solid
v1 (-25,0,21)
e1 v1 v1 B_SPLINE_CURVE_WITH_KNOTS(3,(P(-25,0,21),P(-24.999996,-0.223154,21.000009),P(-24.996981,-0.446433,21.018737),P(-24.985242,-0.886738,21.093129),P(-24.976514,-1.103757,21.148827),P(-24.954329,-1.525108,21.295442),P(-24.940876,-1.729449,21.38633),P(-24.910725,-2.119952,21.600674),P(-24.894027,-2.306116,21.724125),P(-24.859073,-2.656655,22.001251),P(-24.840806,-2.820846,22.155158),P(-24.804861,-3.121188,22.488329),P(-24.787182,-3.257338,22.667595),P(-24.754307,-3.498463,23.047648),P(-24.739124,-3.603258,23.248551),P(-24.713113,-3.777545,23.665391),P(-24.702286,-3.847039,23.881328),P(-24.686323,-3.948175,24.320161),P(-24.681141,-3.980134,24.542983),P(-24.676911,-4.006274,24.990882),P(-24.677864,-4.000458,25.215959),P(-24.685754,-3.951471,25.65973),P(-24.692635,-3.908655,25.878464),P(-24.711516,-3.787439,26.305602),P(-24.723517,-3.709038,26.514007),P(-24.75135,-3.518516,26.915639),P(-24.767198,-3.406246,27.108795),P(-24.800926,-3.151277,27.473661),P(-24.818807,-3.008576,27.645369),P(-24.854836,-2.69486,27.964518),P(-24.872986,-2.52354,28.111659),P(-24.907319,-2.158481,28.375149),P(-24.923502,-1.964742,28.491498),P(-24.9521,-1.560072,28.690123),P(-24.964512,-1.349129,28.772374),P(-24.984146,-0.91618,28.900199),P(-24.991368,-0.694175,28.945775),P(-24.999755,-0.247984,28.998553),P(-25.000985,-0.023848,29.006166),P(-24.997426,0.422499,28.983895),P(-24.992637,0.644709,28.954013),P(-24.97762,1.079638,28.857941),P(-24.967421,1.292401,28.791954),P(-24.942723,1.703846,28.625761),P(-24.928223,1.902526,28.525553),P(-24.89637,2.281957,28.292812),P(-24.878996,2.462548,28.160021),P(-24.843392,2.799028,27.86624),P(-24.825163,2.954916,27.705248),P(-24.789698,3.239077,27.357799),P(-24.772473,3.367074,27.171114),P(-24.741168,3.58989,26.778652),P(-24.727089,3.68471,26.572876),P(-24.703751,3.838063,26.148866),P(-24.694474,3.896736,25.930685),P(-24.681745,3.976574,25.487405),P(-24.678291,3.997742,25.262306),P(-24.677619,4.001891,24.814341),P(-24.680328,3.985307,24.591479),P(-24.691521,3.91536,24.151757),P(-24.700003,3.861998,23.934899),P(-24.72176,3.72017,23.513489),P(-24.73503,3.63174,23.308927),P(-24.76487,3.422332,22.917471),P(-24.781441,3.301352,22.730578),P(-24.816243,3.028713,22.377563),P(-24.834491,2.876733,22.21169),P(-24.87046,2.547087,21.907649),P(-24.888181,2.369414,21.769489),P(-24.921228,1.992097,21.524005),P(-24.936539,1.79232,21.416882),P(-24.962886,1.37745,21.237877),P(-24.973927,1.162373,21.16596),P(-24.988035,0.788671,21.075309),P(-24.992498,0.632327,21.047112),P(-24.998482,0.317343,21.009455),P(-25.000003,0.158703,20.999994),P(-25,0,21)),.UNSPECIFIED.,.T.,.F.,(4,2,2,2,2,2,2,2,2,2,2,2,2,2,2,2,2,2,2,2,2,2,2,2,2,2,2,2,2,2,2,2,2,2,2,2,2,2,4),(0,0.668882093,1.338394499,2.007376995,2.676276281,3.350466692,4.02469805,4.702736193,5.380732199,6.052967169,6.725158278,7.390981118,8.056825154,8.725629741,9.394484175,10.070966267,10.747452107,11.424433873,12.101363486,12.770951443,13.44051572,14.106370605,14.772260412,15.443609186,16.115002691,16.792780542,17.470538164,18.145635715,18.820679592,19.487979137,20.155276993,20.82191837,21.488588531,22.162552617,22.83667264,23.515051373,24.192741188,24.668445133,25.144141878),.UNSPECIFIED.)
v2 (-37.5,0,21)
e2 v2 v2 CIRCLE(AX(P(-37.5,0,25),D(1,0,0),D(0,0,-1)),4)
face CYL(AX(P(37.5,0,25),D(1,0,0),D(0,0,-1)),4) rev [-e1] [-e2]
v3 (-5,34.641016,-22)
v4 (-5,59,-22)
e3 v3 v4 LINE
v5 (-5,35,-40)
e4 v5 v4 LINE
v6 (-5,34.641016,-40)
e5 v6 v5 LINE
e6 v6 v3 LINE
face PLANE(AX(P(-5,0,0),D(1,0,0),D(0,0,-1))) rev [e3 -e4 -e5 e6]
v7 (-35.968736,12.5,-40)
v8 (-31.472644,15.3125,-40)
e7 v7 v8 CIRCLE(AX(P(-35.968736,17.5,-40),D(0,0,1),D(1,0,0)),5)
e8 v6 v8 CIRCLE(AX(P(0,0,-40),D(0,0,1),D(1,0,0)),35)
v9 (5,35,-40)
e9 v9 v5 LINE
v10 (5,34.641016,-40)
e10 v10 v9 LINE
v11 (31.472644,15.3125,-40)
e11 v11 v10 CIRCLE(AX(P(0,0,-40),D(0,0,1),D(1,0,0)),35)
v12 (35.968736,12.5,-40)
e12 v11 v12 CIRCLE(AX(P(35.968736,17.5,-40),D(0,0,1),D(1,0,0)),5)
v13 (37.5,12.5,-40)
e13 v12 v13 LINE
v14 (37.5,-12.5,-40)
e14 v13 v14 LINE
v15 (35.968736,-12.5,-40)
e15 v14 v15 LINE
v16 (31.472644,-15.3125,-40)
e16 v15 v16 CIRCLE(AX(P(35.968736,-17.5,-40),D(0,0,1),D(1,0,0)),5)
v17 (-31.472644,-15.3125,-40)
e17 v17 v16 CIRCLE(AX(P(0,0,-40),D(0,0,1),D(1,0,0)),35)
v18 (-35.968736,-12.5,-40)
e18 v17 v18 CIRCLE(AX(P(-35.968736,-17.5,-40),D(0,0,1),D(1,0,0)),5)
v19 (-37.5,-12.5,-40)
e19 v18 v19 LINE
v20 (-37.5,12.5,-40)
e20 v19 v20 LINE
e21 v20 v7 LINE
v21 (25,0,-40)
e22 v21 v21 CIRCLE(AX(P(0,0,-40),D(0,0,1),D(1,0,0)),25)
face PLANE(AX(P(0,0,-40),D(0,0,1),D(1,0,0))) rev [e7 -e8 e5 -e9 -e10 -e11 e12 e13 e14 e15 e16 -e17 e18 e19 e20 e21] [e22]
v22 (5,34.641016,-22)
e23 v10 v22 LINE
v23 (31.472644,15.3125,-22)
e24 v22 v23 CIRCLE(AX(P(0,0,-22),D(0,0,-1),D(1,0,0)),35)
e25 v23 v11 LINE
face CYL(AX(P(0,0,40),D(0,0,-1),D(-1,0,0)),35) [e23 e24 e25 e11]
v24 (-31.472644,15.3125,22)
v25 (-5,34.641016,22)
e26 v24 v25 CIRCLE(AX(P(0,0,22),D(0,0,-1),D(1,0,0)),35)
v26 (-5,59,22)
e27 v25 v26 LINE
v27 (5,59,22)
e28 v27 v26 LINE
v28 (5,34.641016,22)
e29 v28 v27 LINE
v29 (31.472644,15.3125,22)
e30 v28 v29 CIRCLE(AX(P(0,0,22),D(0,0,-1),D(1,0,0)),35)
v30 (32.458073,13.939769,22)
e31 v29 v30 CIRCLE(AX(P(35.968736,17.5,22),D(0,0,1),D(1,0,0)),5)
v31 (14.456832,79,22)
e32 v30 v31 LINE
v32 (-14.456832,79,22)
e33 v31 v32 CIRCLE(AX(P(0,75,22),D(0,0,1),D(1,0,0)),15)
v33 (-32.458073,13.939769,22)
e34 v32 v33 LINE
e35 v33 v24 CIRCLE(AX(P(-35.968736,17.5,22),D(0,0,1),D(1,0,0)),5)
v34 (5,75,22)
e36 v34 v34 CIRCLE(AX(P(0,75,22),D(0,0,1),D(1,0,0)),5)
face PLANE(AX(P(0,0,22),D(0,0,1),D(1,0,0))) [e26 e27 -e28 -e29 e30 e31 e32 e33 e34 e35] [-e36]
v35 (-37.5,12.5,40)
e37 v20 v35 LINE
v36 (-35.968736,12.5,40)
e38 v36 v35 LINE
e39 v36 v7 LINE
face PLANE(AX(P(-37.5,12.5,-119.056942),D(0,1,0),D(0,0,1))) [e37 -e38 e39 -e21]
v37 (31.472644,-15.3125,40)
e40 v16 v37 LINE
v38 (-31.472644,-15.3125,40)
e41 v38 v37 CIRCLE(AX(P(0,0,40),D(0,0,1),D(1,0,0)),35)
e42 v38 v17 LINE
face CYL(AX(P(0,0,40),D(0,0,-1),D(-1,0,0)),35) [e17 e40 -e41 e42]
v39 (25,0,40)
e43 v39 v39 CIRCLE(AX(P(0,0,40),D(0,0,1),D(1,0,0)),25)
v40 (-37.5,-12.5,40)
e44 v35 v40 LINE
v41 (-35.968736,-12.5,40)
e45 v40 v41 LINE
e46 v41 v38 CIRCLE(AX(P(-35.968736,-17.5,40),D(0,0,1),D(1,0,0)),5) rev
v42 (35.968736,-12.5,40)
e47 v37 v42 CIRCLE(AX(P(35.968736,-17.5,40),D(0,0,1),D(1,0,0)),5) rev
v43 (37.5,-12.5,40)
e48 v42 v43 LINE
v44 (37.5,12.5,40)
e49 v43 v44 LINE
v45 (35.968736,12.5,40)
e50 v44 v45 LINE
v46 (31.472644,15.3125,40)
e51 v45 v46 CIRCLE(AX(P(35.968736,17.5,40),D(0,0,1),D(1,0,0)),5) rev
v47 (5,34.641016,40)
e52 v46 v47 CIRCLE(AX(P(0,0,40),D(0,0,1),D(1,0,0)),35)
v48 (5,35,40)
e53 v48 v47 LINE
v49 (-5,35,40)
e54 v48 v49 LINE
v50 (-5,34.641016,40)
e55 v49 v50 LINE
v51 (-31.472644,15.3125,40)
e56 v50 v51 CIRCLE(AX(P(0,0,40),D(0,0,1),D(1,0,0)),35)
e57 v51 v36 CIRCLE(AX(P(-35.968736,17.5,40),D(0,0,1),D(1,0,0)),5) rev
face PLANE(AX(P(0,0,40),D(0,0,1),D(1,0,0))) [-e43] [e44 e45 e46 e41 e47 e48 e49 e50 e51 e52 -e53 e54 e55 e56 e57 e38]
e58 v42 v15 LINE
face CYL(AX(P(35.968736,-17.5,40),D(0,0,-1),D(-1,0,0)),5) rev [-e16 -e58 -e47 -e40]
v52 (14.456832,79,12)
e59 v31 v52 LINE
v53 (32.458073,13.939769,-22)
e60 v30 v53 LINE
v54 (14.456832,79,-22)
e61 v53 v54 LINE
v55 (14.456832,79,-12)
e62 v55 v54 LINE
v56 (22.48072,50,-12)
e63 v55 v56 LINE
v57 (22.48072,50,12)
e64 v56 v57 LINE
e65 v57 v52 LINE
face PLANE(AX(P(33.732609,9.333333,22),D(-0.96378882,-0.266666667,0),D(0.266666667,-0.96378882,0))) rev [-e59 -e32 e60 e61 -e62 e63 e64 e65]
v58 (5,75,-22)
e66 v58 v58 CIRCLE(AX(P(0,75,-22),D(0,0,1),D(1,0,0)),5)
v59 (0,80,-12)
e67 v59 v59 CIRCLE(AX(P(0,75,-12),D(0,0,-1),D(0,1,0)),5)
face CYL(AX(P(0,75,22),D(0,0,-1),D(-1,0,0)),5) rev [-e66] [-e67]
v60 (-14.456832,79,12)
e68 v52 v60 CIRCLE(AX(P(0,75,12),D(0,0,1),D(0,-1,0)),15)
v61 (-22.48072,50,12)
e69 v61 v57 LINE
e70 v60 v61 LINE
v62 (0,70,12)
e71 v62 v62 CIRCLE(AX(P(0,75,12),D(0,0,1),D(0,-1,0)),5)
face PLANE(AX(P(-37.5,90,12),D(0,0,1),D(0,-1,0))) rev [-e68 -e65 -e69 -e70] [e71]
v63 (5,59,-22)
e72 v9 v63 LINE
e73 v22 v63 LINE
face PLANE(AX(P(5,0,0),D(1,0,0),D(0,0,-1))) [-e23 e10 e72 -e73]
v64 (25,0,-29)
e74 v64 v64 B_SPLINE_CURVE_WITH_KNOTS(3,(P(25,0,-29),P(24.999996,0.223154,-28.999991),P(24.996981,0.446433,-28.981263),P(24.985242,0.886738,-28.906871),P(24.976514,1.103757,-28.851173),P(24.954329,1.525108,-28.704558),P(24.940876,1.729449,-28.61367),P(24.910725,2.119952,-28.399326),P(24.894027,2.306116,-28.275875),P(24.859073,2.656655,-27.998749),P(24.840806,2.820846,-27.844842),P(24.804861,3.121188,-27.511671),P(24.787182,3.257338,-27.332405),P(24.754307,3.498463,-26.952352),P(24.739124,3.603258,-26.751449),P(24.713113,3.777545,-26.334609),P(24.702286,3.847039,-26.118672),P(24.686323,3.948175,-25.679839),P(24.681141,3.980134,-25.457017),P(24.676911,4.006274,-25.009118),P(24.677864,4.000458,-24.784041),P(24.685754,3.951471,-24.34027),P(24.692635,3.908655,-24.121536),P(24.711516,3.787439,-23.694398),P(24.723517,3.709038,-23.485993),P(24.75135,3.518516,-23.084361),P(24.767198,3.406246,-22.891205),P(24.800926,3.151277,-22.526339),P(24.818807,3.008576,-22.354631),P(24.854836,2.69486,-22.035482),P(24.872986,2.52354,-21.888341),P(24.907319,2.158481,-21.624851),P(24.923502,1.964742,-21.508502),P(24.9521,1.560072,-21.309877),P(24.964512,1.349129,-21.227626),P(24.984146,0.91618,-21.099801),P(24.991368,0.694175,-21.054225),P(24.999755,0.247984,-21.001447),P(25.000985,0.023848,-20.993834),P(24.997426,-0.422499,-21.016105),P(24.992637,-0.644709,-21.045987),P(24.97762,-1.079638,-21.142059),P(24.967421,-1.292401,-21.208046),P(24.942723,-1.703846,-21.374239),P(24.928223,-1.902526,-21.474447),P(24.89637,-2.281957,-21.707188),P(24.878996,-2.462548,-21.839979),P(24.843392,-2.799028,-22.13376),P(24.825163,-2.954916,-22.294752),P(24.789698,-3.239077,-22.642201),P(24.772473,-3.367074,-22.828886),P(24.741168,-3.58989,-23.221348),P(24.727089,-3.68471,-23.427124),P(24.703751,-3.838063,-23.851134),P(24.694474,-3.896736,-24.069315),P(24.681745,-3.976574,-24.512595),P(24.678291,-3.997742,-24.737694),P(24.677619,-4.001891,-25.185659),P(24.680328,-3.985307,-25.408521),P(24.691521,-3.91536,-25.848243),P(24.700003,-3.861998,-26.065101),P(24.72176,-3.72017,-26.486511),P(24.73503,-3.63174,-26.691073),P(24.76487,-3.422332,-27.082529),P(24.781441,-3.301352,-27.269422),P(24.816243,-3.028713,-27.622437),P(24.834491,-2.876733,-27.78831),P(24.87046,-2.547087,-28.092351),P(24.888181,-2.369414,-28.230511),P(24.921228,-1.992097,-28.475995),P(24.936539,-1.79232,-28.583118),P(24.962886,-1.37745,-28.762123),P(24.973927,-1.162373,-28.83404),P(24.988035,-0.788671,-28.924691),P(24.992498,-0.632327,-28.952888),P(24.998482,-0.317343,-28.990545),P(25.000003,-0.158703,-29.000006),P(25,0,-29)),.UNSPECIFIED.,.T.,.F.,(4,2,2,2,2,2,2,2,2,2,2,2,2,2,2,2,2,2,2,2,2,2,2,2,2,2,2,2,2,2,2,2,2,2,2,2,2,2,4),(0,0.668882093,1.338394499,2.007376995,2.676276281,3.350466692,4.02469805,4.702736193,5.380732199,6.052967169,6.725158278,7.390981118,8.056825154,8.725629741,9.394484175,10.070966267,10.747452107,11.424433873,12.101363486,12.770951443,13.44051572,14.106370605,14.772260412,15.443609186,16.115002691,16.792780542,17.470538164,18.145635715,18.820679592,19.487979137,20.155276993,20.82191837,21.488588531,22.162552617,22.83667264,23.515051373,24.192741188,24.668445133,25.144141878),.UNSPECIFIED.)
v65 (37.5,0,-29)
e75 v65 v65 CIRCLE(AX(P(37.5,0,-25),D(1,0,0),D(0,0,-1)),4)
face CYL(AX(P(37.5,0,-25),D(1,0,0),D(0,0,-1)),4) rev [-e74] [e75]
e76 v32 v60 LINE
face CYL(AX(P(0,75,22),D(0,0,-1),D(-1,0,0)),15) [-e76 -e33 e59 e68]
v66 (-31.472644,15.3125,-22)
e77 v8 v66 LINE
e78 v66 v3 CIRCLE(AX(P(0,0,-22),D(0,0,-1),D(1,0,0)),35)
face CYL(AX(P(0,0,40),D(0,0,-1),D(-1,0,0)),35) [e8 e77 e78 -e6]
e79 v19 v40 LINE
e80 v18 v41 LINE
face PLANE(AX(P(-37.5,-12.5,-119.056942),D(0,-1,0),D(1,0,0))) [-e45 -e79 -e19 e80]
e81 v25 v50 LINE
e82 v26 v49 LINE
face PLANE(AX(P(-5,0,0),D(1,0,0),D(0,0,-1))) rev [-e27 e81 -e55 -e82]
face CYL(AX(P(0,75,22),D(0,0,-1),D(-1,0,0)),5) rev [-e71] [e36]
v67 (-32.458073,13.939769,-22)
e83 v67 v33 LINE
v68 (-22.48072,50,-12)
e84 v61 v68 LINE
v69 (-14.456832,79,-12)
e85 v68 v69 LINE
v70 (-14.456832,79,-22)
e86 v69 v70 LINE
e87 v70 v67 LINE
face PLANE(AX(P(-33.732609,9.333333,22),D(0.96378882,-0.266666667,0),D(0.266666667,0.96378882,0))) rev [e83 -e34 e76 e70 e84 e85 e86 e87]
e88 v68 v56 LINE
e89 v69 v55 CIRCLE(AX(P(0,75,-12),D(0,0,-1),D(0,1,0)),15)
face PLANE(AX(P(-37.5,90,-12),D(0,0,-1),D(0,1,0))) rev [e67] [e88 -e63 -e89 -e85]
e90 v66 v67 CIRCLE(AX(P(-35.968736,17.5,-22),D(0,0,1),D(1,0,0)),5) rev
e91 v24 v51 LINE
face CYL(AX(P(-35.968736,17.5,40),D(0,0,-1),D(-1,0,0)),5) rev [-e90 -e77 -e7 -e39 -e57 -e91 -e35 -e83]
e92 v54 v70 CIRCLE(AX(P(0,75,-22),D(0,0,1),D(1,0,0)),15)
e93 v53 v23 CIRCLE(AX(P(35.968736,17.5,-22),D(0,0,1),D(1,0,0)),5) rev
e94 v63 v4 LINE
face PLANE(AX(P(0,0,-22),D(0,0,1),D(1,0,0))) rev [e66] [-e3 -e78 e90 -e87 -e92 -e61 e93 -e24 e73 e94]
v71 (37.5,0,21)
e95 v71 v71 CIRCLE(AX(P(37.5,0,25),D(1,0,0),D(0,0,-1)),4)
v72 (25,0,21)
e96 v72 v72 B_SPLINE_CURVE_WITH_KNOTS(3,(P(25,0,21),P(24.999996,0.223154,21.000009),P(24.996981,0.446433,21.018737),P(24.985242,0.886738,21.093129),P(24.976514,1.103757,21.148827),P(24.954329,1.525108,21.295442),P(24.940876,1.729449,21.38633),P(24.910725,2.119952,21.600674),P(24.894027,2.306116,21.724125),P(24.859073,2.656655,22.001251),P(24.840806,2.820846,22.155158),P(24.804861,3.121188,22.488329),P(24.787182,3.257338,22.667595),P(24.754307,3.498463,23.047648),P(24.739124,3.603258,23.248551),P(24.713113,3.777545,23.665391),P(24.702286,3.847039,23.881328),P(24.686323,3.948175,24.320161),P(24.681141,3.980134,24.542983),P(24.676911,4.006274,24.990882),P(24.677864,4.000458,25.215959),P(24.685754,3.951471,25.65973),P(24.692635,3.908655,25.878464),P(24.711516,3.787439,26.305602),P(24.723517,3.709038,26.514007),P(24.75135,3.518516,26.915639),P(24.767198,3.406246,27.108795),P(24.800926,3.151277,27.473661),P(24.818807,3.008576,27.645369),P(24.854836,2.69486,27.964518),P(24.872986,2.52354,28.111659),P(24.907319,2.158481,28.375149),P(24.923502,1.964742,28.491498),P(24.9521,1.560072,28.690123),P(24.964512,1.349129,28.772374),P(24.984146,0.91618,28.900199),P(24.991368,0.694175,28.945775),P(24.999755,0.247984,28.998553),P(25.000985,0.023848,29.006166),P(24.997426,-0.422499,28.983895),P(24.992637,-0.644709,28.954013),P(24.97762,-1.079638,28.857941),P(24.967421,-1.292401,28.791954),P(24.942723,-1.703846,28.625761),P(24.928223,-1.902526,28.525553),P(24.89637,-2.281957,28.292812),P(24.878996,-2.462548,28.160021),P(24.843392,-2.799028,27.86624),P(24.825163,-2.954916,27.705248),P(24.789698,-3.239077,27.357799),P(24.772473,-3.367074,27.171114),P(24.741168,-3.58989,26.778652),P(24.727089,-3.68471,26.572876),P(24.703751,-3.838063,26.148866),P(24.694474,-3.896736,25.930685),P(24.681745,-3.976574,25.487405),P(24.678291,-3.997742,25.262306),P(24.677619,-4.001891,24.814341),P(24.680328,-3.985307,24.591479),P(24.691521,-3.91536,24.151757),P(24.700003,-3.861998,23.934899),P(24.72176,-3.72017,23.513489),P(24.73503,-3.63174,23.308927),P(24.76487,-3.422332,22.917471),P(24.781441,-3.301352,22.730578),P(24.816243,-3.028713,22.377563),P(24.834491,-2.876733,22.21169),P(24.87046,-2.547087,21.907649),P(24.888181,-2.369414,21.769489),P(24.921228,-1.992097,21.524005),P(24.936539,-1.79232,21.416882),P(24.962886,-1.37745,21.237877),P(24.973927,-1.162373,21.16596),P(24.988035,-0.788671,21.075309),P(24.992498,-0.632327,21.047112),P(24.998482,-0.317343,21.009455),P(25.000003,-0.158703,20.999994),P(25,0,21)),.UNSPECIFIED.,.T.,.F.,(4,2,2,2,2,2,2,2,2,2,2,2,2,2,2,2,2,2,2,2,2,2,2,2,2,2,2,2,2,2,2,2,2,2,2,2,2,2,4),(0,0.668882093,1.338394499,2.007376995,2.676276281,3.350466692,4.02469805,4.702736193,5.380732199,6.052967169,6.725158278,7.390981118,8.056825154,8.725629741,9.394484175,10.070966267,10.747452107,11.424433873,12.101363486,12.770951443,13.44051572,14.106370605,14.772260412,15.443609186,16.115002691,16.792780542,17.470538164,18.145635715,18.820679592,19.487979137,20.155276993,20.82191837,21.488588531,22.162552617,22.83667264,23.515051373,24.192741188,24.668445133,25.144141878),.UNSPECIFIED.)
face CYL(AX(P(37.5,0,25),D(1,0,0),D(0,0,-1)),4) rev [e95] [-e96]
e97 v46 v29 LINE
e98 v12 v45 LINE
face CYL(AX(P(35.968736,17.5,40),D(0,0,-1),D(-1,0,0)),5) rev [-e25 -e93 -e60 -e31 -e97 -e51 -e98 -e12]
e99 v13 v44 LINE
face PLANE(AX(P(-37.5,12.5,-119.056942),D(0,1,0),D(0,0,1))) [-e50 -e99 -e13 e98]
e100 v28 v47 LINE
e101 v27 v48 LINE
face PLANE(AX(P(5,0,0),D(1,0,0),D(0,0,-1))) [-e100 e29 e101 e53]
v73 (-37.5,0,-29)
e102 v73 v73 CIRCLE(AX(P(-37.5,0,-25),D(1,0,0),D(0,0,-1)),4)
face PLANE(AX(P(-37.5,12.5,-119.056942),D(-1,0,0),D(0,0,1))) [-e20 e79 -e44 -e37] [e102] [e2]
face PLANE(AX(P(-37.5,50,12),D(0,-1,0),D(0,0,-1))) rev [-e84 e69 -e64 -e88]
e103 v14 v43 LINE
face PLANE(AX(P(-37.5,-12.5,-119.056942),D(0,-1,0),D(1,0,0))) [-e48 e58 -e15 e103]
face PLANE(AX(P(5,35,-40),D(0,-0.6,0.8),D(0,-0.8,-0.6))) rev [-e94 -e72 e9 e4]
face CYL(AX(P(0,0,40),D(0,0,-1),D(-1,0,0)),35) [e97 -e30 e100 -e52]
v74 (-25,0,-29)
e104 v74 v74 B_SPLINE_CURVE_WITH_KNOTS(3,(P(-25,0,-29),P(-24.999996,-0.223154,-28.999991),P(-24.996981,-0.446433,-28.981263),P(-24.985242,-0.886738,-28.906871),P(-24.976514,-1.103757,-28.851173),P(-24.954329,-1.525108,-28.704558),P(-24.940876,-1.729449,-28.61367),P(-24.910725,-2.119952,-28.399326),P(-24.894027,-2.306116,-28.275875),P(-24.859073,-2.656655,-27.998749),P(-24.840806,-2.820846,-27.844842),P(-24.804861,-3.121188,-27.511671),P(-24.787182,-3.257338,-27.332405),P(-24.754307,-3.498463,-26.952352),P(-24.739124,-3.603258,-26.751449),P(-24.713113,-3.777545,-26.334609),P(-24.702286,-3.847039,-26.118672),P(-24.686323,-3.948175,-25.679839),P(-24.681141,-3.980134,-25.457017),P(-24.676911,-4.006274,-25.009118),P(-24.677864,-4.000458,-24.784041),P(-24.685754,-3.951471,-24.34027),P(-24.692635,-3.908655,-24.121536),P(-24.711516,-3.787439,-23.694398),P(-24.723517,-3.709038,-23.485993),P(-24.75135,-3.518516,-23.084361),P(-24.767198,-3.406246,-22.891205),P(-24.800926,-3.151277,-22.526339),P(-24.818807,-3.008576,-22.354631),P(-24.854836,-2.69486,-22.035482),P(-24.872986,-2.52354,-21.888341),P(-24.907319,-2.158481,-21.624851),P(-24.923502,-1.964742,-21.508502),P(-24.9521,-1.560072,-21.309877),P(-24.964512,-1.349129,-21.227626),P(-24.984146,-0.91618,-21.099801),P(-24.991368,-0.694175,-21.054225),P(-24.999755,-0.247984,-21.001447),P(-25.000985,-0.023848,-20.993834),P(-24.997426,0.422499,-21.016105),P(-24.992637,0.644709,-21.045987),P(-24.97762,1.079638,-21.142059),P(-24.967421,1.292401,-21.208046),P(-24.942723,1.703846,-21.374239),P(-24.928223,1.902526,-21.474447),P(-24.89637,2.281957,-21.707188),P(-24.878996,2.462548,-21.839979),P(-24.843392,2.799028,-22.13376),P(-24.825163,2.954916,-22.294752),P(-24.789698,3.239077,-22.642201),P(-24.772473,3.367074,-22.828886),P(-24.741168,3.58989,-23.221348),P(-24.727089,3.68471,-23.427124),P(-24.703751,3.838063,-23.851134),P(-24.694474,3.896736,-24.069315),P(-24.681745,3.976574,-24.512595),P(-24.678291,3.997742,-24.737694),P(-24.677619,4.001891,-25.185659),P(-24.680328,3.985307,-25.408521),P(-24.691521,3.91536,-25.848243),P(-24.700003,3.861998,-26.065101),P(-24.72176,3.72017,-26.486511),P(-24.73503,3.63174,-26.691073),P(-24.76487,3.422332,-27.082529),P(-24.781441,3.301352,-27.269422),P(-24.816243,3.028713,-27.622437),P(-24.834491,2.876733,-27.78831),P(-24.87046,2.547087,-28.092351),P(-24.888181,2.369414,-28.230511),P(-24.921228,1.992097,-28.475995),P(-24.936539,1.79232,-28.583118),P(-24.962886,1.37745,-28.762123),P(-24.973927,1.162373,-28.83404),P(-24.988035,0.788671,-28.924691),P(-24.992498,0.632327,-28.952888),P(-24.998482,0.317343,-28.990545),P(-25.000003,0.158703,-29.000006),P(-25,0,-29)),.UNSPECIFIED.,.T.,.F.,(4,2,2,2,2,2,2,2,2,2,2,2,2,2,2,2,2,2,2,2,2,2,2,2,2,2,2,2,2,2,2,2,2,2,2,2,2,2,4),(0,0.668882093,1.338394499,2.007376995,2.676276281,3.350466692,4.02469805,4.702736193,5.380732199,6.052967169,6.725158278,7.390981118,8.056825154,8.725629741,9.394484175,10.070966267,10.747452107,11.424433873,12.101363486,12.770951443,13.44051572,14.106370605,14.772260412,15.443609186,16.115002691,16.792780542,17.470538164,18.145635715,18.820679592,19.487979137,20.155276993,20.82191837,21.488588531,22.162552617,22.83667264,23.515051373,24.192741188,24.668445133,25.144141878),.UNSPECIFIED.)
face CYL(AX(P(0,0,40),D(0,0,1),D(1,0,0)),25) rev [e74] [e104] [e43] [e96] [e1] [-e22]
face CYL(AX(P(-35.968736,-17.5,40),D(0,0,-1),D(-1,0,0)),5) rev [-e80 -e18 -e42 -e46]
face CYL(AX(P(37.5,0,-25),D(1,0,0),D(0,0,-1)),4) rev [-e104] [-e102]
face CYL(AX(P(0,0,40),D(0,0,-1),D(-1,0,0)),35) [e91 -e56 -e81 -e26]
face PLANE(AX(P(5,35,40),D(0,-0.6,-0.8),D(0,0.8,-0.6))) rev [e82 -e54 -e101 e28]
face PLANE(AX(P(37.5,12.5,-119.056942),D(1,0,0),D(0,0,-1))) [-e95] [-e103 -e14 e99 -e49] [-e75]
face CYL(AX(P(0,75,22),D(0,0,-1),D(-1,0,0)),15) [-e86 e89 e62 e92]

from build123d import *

# Parameters (mm, degrees)
SKETCH1_R                       = 35
BOSS_EXTRUDE1_DEPTH             = 40
SKETCH2_R                       = 5
BOSS_EXTRUDE2_DEPTH             = 22
BOSS_EXTRUDE3_DEPTH             = 5
HOLE1_D                         = 50
BOSS_EXTRUDE4_REACH             = 106.523
SKETCH7_W                       = 75
SKETCH7_H                       = 25
BOSS_EXTRUDE4_DIRECTION_2_REACH = 106.523
HOLE2_D                         = 50
CUT_EXTRUDE1_DEPTH              = 106.386194542
CUT_EXTRUDE1_DEPTH_BACK         = 106.386194542
SKETCH11_W                      = 24
SKETCH11_H                      = 40
HOLE3_D                         = 8
FILLET1_R                       = 5


with BuildPart() as part:
    # Sketch1 → Boss-Extrude1 (new, symmetric)
    with BuildSketch(Plane.XY):
        Circle(SKETCH1_R)
    extrude(amount=BOSS_EXTRUDE1_DEPTH, both=True)

    # Sketch2 → Boss-Extrude2 (add, symmetric)
    with BuildSketch(Plane.XY):
        with BuildLine():
            Line((-33.732608688, 9.333333333), (-14.456832295, 79))
            ThreePointArc((-14.456832295, 79), (0, 90), (14.456832295, 79))
            Line((14.456832295, 79), (33.732608688, 9.333333333))
            ThreePointArc((33.732608688, 9.333333333), (0, 35), (-33.732608688, 9.333333333))
        make_face()
        with Locations((0, 75)):
            Circle(SKETCH2_R, mode=Mode.SUBTRACT)
    extrude(amount=BOSS_EXTRUDE2_DEPTH, both=True)

    # Sketch3 → Boss-Extrude3 (add, symmetric)
    with BuildSketch(Plane(origin=(0, 0, 0), x_dir=(0, 0, -1), z_dir=(1, 0, 0))):
        Polygon((-40, 35), (-22, 59), (22, 59), (40, 35), (40, 0), (-40, 0), align=None)
    extrude(amount=BOSS_EXTRUDE3_DEPTH, both=True)

    # Hole1 (through all)
    with Locations(Plane.XY.offset(40)):
        with Locations((0, 0)):
            Hole(HOLE1_D / 2)

    # Boss-Extrude4: up to this face of the body (flat: up to its plane)
    boss_extrude4_end = Plane(part.part.faces().sort_by_distance((0, -34.010050506, -40))[0])
    # Sketch7 → Boss-Extrude4 (add, up to the picked face)
    with BuildSketch(Plane.XY, mode=Mode.PRIVATE) as boss_extrude4_sk1:
        Rectangle(SKETCH7_W, SKETCH7_H)
    boss_extrude4_tool1 = split(extrude(boss_extrude4_sk1.sketch, amount=-BOSS_EXTRUDE4_REACH, mode=Mode.PRIVATE), bisect_by=boss_extrude4_end, keep=Keep.BOTH, mode=Mode.PRIVATE)
    add(boss_extrude4_tool1.solids().sort_by(Axis((0, 0, 0), (0, 0, -1)))[0])

    # Boss-Extrude4 direction 2: up to this face of the body (flat: up to its plane)
    boss_extrude4_direction_2_end = Plane(part.part.faces().sort_by_distance((0, -34.010050506, 40))[0])
    # Sketch7 → Boss-Extrude4 direction 2 (add, up to the picked face)
    with BuildSketch(Plane.XY, mode=Mode.PRIVATE) as boss_extrude4_direction_2_sk1:
        Rectangle(SKETCH7_W, SKETCH7_H)
    boss_extrude4_direction_2_tool1 = split(extrude(boss_extrude4_direction_2_sk1.sketch, amount=BOSS_EXTRUDE4_DIRECTION_2_REACH, mode=Mode.PRIVATE), bisect_by=boss_extrude4_direction_2_end, keep=Keep.BOTH, mode=Mode.PRIVATE)
    add(boss_extrude4_direction_2_tool1.solids().sort_by(Axis((0, 0, 0), (0, 0, 1)))[0])

    # Hole2 (through all)
    with Locations(Plane.XY.offset(40)):
        with Locations((0, 0)):
            Hole(HOLE2_D / 2)

    # Sketch11 → Cut-Extrude1 (cut, two sides: drawn at the far end of the back side and taken through both)
    with BuildSketch(Plane(origin=(0, 0, 0), x_dir=(0, 0, -1), z_dir=(1, 0, 0)).offset(-CUT_EXTRUDE1_DEPTH_BACK)):
        with Locations((0, 70)):
            Rectangle(SKETCH11_W, SKETCH11_H)
    extrude(amount=CUT_EXTRUDE1_DEPTH + CUT_EXTRUDE1_DEPTH_BACK, mode=Mode.SUBTRACT)

    # Hole3 (through all)
    with Locations(Plane(origin=(37.5, 0, 0), x_dir=(0, 0, -1), z_dir=(1, 0, 0))):
        with Locations((-25, 0), (25, 0)):
            Hole(HOLE3_D / 2)

    # Fillet1
    fillet1_edges = [part.edges().sort_by_distance(p)[0] for p in [
        (-32.691742077, 12.5, 31),
    ]]
    fillet(fillet1_edges, radius=FILLET1_R - 0.0001)  # a hair under: the kernel refuses the full size
    fillet1_2_edges = [part.edges().sort_by_distance(p)[0] for p in [
        (32.691742077, 12.5, 31),
    ]]
    fillet(fillet1_2_edges, radius=FILLET1_R)
    fillet1_3_edges = [part.edges().sort_by_distance(p)[0] for p in [
        (-32.691742077, -12.5, 0),
    ]]
    fillet(fillet1_3_edges, radius=FILLET1_R)
    fillet1_4_edges = [part.edges().sort_by_distance(p)[0] for p in [
        (32.691742077, -12.5, 0),
    ]]
    fillet(fillet1_4_edges, radius=FILLET1_R)


solid = part.part
